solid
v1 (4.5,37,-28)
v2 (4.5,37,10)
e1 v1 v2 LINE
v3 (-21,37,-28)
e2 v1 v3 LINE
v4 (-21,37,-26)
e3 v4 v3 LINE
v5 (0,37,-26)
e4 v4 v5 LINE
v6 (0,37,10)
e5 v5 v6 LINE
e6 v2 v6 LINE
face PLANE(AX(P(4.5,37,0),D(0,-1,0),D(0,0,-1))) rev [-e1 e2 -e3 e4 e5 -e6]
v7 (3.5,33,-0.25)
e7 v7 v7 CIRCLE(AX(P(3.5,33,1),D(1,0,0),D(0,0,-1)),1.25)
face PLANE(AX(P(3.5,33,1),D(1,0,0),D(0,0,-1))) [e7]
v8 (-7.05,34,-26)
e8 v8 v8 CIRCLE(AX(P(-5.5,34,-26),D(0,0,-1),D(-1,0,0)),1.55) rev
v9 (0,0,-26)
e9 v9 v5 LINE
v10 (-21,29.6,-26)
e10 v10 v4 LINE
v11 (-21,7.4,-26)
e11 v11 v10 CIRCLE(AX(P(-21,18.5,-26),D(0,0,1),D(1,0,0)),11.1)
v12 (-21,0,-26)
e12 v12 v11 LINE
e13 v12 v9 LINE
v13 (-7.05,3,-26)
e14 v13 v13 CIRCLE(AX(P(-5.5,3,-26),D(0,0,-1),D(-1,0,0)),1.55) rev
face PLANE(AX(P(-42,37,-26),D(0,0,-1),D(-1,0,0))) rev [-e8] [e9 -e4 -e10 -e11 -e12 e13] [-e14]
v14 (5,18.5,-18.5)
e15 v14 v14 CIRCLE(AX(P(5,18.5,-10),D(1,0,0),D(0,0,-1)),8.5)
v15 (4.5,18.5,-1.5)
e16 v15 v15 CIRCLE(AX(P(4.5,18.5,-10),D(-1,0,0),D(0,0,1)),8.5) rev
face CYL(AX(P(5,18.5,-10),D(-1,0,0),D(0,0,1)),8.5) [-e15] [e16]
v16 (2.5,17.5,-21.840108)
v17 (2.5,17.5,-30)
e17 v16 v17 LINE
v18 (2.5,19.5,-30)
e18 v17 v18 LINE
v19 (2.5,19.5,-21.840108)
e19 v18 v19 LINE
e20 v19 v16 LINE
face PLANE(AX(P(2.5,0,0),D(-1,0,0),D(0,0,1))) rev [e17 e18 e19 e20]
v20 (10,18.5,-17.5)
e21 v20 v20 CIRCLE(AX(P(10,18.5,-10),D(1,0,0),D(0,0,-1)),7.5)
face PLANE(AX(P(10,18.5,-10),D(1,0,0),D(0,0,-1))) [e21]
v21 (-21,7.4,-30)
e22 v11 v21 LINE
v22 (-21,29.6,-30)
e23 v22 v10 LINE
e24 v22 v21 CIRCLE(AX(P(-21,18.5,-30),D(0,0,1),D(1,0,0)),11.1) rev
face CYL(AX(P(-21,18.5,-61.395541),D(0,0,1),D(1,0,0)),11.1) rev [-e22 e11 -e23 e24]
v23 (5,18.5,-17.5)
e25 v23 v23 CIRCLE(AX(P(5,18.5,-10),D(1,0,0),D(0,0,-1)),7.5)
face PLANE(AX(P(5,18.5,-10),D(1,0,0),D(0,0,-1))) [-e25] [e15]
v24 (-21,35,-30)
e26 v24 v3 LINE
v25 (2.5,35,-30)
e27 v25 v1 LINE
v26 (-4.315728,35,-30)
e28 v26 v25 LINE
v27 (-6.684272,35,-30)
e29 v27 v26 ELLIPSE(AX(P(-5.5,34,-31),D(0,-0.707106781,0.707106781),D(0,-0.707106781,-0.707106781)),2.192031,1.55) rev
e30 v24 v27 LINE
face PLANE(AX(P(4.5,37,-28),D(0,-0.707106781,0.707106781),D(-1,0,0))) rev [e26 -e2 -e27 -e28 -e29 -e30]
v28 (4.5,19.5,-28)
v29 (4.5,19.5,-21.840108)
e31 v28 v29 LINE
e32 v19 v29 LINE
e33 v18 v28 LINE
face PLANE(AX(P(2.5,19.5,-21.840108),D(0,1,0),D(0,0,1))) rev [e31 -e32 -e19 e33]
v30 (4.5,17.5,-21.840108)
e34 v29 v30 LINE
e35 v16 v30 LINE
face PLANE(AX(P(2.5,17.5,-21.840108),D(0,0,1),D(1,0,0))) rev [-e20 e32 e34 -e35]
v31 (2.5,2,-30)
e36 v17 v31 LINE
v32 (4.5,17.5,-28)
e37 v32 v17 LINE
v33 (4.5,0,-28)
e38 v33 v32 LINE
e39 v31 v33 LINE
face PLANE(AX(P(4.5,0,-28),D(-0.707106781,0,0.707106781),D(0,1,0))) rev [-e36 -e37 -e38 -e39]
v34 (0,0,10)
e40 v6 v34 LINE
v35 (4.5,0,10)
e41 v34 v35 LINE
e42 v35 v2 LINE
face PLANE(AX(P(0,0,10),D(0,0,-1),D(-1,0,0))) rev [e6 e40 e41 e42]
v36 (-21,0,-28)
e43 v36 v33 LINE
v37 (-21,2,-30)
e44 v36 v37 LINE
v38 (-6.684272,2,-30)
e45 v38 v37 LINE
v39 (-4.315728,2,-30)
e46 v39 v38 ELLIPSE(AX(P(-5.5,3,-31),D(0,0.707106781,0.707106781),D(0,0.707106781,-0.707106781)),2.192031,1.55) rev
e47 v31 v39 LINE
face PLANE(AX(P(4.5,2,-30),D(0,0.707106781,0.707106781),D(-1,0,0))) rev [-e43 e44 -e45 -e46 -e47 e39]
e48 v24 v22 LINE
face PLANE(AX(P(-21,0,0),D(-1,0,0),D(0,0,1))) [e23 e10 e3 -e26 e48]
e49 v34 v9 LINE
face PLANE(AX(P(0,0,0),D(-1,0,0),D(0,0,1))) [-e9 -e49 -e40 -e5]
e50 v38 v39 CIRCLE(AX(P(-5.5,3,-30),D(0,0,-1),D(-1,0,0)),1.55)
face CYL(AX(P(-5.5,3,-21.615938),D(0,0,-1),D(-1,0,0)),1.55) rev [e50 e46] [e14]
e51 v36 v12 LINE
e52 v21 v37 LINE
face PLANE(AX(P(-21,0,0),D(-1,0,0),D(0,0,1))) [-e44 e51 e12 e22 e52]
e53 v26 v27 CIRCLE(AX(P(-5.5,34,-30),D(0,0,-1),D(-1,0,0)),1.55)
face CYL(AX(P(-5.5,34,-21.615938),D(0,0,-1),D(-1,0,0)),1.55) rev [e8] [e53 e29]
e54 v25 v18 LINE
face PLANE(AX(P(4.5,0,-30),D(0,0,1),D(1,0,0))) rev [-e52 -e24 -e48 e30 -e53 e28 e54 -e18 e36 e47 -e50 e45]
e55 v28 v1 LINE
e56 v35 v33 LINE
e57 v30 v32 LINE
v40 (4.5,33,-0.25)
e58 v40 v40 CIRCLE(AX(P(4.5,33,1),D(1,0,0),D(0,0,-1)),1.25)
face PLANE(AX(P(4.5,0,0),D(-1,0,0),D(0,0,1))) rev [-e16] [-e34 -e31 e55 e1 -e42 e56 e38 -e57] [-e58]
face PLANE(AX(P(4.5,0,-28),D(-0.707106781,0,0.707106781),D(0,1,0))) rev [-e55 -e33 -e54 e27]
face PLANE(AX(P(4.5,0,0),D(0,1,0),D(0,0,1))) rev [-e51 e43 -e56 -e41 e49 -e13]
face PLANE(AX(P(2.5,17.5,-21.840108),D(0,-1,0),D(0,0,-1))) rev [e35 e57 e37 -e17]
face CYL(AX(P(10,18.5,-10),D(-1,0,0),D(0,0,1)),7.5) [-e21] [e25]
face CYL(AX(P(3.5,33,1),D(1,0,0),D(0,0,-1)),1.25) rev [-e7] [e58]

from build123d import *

# Parameters (mm, degrees)
SKETCH1_W           = 30
SKETCH1_H           = 37
BOSS_EXTRUDE1_DEPTH = 4.5
SKETCH2_W           = 4
SKETCH2_H           = 37
BOSS_EXTRUDE2_DEPTH = 42
SKETCH3_W           = 30
SKETCH3_H           = 37
BOSS_EXTRUDE3_DEPTH = 4.5
SKETCH8_R           = 11.1
CUT_EXTRUDE1_DEPTH  = 4
SKETCH9_R           = 1.55
CUT_EXTRUDE2_DEPTH  = 4
CHAMFER3_SIZE       = 2
SKETCH_6_R          = 7.5
EXTRUDE_2_DEPTH     = 5.5
SKETCH_5_R          = 4
EXTRUDE_1_DEPTH     = 20.5
SKETCH_15_R         = 8.5
EXTRUDE_6_DEPTH     = 0.5
EXTRUDE_START       = 0.5
SKETCH_16_R         = 8.5
SKETCH_16_R_2       = 7.45
EXTRUDE_7_DEPTH     = 0.5
SKETCH_17_W         = 4.5
SKETCH_17_H         = 37
EXTRUDE_8_DEPTH     = 10
SKETCH_23_R         = 1.25
CUT_EXTRUDE_4_DEPTH = 1
EXTRUDE_START_2     = -20.5
EXTRUDE_11_DEPTH    = 20.5
CUT_EXTRUDE_5_DEPTH = 67.219332525
SKETCH_27_W         = 8.159891724
SKETCH_27_H         = 2
CUT_EXTRUDE_6_DEPTH = 2


with BuildPart() as part:
    # Sketch1 → Boss-Extrude1 (new body)
    with BuildSketch(Plane(origin=(0, 0, 0), x_dir=(0, 0, -1), z_dir=(1, 0, 0))):
        with Locations((15, 18.5)):
            Rectangle(SKETCH1_W, SKETCH1_H)
    extrude(amount=BOSS_EXTRUDE1_DEPTH)

    # Sketch2 → Boss-Extrude2 (add)
    with BuildSketch(Plane.ZY):
        with Locations((-28, 18.5)):
            Rectangle(SKETCH2_W, SKETCH2_H)
    extrude(amount=BOSS_EXTRUDE2_DEPTH)

    # Sketch3 → Boss-Extrude3 (add)
    with BuildSketch(Plane.ZY.offset(42)):
        with Locations((-15, 18.5)):
            Rectangle(SKETCH3_W, SKETCH3_H)
    extrude(amount=BOSS_EXTRUDE3_DEPTH)

    # Sketch8 → Cut-Extrude1 (cut)
    with BuildSketch(Plane.XY.offset(-26)):
        with Locations((-21, 18.5)):
            Circle(SKETCH8_R)
    extrude(amount=-CUT_EXTRUDE1_DEPTH, mode=Mode.SUBTRACT)

    # Sketch9 → Cut-Extrude2 (cut)
    with BuildSketch(Plane(origin=(0, 0, -30), x_dir=(-1, 0, 0), z_dir=(0, 0, -1))):
        with Locations((5.5, 34)):
            Circle(SKETCH9_R)
        with Locations((36.5, 34)):
            Circle(SKETCH9_R)
        with Locations((36.5, 3)):
            Circle(SKETCH9_R)
        with Locations((5.5, 3)):
            Circle(SKETCH9_R)
    extrude(amount=-CUT_EXTRUDE2_DEPTH, mode=Mode.SUBTRACT)

    # Chamfer3
    # the kernel refuses this chamfer: 2 mm, written as the material it takes off along each edge
    with BuildSketch(Plane(origin=(4.5, -5.143365976, -30), x_dir=(0.02749587661058651, 0, 0.9996219169112968), z_dir=(0, 1, 0))) as chamfer3_piece_1:
        Polygon((CHAMFER3_SIZE * 0.999621916911, -CHAMFER3_SIZE * 0.0274958766106), (-CHAMFER3_SIZE * 0.0274958766106, -CHAMFER3_SIZE * 0.999621916911), (0, 0), align=None)
    extrude(amount=47.286731952, mode=Mode.SUBTRACT)
    with BuildSketch(Plane(origin=(-46.5, 42.143365976, -30), x_dir=(0.9996219169112968, 0, -0.027495876610585647), z_dir=(0, -1, 0))) as chamfer3_piece_2:
        Polygon((CHAMFER3_SIZE * 0.999621916911, CHAMFER3_SIZE * 0.0274958766106), (-CHAMFER3_SIZE * 0.0274958766106, CHAMFER3_SIZE * 0.999621916911), (0, 0), align=None)
    extrude(amount=47.286731952, mode=Mode.SUBTRACT)
    with BuildSketch(Plane(origin=(-51.643365976, 37, -30), x_dir=(0, -0.9996219169112968, -0.027495876610585647), z_dir=(1, 0, 0)), Plane(origin=(-51.643365976, 0, -30), x_dir=(0, -0.02749587661058639, 0.9996219169112968), z_dir=(1, 0, 0))) as chamfer3_piece_3:
        Polygon((CHAMFER3_SIZE * 0.999621916911, -CHAMFER3_SIZE * 0.0274958766106), (-CHAMFER3_SIZE * 0.0274958766106, -CHAMFER3_SIZE * 0.999621916911), (0, 0), align=None)
    extrude(amount=61.286731952, mode=Mode.SUBTRACT)

    # 草图6 → 凸台-拉伸2 (add)
    with BuildSketch(Plane(origin=(4.5, 0, 0), x_dir=(0, 0, -1), z_dir=(1, 0, 0))):
        with Locations((10, 18.5)):
            Circle(SKETCH_6_R)
    extrude(amount=EXTRUDE_2_DEPTH)

    # 草图5 → 凸台-拉伸1 (add)
    with BuildSketch(Plane.ZY.offset(46.5)):
        with Locations((-10, 18.5)):
            Circle(SKETCH_5_R)
    extrude(amount=EXTRUDE_1_DEPTH)

    # 草图15 → 凸台-拉伸6 (add)
    with BuildSketch(Plane.ZY.offset(46.5)):
        with Locations((-10, 18.5)):
            Circle(SKETCH_15_R)
    extrude(amount=EXTRUDE_6_DEPTH)

    # 草图16 → 凸台-拉伸7 (add)
    with BuildSketch(Plane(origin=(4.5, 0, 0), x_dir=(0, 0, -1), z_dir=(1, 0, 0)).offset(EXTRUDE_START)):
        with Locations(Location((10, 18.5, 0), (0, 0, 180))):
            Circle(SKETCH_16_R)
        with Locations((10, 18.5)):
            Circle(SKETCH_16_R_2, mode=Mode.SUBTRACT)
    extrude(amount=-EXTRUDE_7_DEPTH)

    # 草图17 → 凸台-拉伸8 (add)
    with BuildSketch(Plane.XY):
        with Locations((2.25, 18.5)):
            Rectangle(SKETCH_17_W, SKETCH_17_H)
    extrude(amount=EXTRUDE_8_DEPTH)

    # 草图23 → 切除-拉伸4 (cut)
    with BuildSketch(Plane(origin=(4.5, 0, 0), x_dir=(0, 0, -1), z_dir=(1, 0, 0))):
        with Locations((-1, 33)):
            Circle(SKETCH_23_R)
    extrude(amount=-CUT_EXTRUDE_4_DEPTH, mode=Mode.SUBTRACT)

    # 草图26 → 凸台-拉伸11 (add)
    with BuildSketch(Plane.ZY.offset(67).offset(EXTRUDE_START_2)):
        with BuildLine():
            ThreePointArc((-8.063508327, 22), (-10, 23.5), (-11.936491673, 22))
            ThreePointArc((-11.936491673, 22), (-10, 22.5), (-8.063508327, 22))
        make_face()
        with BuildLine():
            ThreePointArc((-13.5, 16.563508327), (-14, 18.5), (-13.5, 20.436491673))
            ThreePointArc((-13.5, 20.436491673), (-15, 18.5), (-13.5, 16.563508327))
        make_face()
        with BuildLine():
            ThreePointArc((-6.5, 16.563508327), (-5, 18.5), (-6.5, 20.436491673))
            ThreePointArc((-6.5, 20.436491673), (-6, 18.5), (-6.5, 16.563508327))
        make_face()
        with BuildLine():
            ThreePointArc((-8.063508327, 15), (-10, 14.5), (-11.936491673, 15))
            ThreePointArc((-11.936491673, 15), (-10, 13.5), (-8.063508327, 15))
        make_face()
    extrude(amount=EXTRUDE_11_DEPTH)

    # 草图25 → 切除-拉伸5 (cut, through all)
    with BuildSketch(Plane.ZY.offset(21)):
        Polygon((21.58280616, 37.67604856), (19.928852176, -12.32395144), (-38.530236753, -10.39017858), (-38.530236753, 37.67604856), align=None)
    extrude(amount=CUT_EXTRUDE_5_DEPTH, mode=Mode.SUBTRACT)

    # 草图27 → 切除-拉伸6 (cut)
    with BuildSketch(Plane(origin=(4.5, 0, 0), x_dir=(0, 0, -1), z_dir=(1, 0, 0))):
        with Locations((25.920054138, 18.5)):
            Rectangle(SKETCH_27_W, SKETCH_27_H)
    extrude(amount=-CUT_EXTRUDE_6_DEPTH, mode=Mode.SUBTRACT)


solid = part.part
